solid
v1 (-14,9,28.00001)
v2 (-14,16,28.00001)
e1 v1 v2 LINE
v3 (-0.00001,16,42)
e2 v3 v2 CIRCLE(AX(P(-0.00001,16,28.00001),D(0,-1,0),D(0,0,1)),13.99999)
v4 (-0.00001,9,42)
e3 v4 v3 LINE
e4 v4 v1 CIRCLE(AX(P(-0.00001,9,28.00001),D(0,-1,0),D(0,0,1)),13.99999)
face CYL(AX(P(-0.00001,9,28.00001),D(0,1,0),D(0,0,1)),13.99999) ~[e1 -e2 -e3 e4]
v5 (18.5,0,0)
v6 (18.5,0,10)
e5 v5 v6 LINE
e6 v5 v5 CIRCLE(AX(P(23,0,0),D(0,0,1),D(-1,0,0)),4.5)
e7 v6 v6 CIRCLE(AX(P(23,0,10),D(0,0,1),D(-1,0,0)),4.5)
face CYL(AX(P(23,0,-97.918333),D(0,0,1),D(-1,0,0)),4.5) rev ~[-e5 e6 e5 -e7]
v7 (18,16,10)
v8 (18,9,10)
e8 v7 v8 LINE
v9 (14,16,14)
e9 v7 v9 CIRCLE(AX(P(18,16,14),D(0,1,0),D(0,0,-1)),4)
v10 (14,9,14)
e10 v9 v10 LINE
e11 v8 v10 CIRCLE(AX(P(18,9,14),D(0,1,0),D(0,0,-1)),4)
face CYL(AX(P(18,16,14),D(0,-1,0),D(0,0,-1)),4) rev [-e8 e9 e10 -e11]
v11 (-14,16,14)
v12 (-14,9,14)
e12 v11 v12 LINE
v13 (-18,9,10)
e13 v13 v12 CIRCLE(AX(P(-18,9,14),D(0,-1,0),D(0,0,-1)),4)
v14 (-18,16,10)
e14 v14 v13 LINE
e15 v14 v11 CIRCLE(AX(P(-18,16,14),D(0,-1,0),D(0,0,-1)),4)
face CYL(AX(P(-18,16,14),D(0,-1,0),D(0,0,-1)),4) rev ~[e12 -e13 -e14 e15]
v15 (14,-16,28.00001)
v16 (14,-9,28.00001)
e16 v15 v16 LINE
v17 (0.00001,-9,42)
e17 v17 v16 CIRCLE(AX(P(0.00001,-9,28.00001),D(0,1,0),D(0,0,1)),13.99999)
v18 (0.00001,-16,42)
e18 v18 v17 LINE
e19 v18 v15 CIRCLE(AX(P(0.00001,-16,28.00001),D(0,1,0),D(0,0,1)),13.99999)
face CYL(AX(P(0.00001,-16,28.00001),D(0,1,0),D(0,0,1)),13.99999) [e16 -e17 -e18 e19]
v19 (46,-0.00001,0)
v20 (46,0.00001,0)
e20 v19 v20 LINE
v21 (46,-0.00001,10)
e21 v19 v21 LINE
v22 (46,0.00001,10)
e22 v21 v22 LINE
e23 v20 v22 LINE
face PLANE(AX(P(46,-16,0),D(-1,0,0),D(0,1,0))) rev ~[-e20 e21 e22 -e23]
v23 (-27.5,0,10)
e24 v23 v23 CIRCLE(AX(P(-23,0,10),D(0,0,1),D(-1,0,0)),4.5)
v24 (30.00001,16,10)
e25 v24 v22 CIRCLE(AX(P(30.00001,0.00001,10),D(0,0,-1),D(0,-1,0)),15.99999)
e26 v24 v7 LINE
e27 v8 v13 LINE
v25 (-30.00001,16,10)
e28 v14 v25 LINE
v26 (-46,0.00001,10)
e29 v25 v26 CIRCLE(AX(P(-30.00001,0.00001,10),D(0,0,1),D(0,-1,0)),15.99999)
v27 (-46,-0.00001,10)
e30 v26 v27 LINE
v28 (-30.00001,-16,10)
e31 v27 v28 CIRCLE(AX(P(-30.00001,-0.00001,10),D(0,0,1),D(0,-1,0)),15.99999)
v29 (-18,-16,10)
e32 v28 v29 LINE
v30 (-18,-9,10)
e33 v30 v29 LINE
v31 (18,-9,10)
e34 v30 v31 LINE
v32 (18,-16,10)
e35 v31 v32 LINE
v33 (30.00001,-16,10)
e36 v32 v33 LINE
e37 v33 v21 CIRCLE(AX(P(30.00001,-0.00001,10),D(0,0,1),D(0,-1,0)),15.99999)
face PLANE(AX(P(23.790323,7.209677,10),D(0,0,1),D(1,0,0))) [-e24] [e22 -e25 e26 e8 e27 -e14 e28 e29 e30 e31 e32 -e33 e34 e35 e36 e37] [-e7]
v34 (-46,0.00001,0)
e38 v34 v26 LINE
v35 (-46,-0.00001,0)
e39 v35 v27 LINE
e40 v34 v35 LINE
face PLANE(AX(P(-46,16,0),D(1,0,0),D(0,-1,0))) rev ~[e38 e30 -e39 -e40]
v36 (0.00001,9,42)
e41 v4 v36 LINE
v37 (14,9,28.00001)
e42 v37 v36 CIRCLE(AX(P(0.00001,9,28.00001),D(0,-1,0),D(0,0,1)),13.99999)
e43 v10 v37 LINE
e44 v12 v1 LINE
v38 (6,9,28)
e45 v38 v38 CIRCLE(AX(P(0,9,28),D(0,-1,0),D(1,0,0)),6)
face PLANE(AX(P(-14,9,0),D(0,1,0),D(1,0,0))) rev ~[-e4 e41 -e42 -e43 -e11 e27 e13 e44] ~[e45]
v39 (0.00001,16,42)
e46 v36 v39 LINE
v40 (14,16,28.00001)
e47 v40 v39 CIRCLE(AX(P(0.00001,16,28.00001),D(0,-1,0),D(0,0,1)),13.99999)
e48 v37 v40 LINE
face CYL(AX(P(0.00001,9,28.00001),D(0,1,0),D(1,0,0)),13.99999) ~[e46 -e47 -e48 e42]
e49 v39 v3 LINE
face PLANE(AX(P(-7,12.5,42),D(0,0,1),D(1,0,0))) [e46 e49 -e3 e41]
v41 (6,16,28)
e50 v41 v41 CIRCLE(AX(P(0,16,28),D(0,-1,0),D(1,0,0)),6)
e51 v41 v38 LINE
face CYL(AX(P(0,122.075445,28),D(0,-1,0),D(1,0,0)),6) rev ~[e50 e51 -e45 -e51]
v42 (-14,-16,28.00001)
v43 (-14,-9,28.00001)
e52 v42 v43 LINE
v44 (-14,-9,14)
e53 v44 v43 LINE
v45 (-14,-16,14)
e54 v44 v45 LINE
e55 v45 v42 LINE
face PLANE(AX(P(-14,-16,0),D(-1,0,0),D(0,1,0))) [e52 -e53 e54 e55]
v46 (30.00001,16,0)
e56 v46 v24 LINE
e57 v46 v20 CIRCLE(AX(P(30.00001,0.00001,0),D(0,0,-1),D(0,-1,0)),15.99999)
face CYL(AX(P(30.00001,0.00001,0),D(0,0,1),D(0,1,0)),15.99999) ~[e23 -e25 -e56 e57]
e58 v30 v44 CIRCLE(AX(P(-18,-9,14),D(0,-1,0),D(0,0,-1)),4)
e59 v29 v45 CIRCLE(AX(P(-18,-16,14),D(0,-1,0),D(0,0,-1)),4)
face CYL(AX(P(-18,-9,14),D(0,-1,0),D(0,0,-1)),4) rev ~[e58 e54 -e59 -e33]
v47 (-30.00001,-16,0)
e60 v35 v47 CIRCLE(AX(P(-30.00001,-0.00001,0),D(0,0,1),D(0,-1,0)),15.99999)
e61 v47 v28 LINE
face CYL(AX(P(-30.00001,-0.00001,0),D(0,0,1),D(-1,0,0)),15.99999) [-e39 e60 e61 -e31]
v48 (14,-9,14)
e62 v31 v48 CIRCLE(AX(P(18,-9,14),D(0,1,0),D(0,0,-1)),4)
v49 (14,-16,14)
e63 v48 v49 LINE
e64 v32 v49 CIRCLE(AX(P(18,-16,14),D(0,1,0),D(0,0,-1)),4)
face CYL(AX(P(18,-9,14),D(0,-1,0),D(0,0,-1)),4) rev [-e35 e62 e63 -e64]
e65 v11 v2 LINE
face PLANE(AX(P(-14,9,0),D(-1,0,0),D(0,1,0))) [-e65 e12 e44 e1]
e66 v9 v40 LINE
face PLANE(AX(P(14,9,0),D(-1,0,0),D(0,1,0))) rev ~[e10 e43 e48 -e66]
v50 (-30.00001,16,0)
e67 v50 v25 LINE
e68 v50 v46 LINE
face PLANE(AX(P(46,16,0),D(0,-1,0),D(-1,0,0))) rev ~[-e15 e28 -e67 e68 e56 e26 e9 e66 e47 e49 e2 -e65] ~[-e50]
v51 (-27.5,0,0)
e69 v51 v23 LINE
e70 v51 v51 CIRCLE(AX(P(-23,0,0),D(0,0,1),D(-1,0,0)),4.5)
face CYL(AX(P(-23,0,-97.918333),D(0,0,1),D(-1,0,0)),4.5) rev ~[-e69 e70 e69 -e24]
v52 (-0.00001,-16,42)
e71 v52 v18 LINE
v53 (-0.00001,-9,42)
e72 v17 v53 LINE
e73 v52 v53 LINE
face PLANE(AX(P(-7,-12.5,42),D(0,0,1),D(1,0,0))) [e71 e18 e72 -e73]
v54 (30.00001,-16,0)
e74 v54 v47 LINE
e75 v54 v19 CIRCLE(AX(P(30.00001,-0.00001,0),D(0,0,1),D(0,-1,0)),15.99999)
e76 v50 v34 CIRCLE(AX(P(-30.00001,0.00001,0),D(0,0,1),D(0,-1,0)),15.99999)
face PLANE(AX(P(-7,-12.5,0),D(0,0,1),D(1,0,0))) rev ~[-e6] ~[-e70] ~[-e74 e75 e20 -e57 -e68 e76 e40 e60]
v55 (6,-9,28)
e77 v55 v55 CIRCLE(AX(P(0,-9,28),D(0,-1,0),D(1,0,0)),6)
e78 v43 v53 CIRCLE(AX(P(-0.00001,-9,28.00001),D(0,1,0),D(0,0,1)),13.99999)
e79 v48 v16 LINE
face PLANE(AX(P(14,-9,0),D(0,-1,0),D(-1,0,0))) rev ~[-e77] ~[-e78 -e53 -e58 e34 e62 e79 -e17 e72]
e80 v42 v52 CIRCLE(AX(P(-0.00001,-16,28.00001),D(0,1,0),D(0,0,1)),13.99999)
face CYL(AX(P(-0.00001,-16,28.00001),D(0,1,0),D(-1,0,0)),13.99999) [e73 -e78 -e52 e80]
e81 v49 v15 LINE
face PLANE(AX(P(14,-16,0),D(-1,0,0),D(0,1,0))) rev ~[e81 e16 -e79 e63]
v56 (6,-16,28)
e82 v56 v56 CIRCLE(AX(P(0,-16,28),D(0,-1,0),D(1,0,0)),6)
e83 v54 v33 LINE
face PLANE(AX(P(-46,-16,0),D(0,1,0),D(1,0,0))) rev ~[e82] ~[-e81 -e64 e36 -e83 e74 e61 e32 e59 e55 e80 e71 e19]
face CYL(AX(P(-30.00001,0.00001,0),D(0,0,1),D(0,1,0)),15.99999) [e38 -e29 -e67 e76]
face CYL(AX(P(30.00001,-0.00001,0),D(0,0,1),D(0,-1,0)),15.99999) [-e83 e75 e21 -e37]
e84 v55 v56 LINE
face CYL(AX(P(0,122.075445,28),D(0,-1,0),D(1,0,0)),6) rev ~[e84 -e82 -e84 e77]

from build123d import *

# Parameters (mm, degrees)
F0_W     = 14
F0_H     = 7
F1_DEPTH = 10
F2_R     = 15.99999
F3_D     = 9
F4_DEPTH = 42
F5_R     = 4
F7_D     = 12
F8_R     = 13.99999


# Not quite as in the source:
# - a fillet or chamfer is up to 0.001 mm smaller than in the source, because OpenCascade refuses the exact size


with BuildPart() as f1:
    # F0 (on Top) → F1 (new body)
    with BuildSketch(Plane.XY):
        Polygon((46, 0), (46, 16), (14, 16), (14, 9), (0, 9), (0, 0), (23, 0), align=None)
        with Locations((7, 12.5)):
            Rectangle(F0_W, F0_H)
        Polygon((46, -16), (46, 0), (23, 0), (0, 0), (0, -9), (14, -9), (14, -16), align=None)
        with Locations((-7, 12.5)):
            Rectangle(F0_W, F0_H)
        Polygon((-14, 9), (-14, 16), (-46, 16), (-46, 0), (-23, 0), (0, 0), (0, 9), align=None)
        with Locations((7, -12.5)):
            Rectangle(F0_W, F0_H)
        Polygon((0, -9), (0, 0), (-23, 0), (-46, 0), (-46, -16), (-14, -16), (-14, -9), align=None)
        with Locations((-7, -12.5)):
            Rectangle(F0_W, F0_H)
    extrude(amount=F1_DEPTH)

    # F2 (radius 16 in the source; OpenCascade refuses exactly that, so slightly less here)
    f2_edges = [f1.edges().sort_by_distance(p)[0] for p in [
        (-46, -16, 5),
        (-46, 16, 5),
        (46, 16, 5),
        (46, -16, 5),
    ]]
    fillet(f2_edges, radius=F2_R)

    # F3 (through all)
    with Locations(Plane(origin=(0, 0, 0), x_dir=(1, 0, 0), z_dir=(0, 0, -1))):
        with Locations((23, 0), (-23, 0)):
            Hole(F3_D / 2)

    # F0 (on Top) → F4 (join)
    with BuildSketch(Plane.XY):
        with Locations((-7, -12.5)):
            Rectangle(F0_W, F0_H)
        with Locations((7, -12.5)):
            Rectangle(F0_W, F0_H)
        with Locations((-7, 12.5)):
            Rectangle(F0_W, F0_H)
        with Locations((7, 12.5)):
            Rectangle(F0_W, F0_H)
    extrude(amount=F4_DEPTH)

    # F5
    f5_edges = [f1.edges().sort_by_distance(p)[0] for p in [
        (14, 12.5, 10),
        (14, -12.5, 10),
        (-14, 12.5, 10),
        (-14, -12.5, 10),
    ]]
    fillet(f5_edges, radius=F5_R)

    # F7 (through all)
    with Locations(Plane(origin=(0, 16, 0), x_dir=(-1, 0, 0), z_dir=(0, 1, 0))):
        with Locations((0, 28)):
            Hole(F7_D / 2)

    # F8 (radius 14 in the source; OpenCascade refuses exactly that, so slightly less here)
    f8_edges = [f1.edges().sort_by_distance(p)[0] for p in [
        (14, 12.5, 42),
        (-14, 12.5, 42),
        (14, -12.5, 42),
        (-14, -12.5, 42),
    ]]
    fillet(f8_edges, radius=F8_R)


solid = f1.part
